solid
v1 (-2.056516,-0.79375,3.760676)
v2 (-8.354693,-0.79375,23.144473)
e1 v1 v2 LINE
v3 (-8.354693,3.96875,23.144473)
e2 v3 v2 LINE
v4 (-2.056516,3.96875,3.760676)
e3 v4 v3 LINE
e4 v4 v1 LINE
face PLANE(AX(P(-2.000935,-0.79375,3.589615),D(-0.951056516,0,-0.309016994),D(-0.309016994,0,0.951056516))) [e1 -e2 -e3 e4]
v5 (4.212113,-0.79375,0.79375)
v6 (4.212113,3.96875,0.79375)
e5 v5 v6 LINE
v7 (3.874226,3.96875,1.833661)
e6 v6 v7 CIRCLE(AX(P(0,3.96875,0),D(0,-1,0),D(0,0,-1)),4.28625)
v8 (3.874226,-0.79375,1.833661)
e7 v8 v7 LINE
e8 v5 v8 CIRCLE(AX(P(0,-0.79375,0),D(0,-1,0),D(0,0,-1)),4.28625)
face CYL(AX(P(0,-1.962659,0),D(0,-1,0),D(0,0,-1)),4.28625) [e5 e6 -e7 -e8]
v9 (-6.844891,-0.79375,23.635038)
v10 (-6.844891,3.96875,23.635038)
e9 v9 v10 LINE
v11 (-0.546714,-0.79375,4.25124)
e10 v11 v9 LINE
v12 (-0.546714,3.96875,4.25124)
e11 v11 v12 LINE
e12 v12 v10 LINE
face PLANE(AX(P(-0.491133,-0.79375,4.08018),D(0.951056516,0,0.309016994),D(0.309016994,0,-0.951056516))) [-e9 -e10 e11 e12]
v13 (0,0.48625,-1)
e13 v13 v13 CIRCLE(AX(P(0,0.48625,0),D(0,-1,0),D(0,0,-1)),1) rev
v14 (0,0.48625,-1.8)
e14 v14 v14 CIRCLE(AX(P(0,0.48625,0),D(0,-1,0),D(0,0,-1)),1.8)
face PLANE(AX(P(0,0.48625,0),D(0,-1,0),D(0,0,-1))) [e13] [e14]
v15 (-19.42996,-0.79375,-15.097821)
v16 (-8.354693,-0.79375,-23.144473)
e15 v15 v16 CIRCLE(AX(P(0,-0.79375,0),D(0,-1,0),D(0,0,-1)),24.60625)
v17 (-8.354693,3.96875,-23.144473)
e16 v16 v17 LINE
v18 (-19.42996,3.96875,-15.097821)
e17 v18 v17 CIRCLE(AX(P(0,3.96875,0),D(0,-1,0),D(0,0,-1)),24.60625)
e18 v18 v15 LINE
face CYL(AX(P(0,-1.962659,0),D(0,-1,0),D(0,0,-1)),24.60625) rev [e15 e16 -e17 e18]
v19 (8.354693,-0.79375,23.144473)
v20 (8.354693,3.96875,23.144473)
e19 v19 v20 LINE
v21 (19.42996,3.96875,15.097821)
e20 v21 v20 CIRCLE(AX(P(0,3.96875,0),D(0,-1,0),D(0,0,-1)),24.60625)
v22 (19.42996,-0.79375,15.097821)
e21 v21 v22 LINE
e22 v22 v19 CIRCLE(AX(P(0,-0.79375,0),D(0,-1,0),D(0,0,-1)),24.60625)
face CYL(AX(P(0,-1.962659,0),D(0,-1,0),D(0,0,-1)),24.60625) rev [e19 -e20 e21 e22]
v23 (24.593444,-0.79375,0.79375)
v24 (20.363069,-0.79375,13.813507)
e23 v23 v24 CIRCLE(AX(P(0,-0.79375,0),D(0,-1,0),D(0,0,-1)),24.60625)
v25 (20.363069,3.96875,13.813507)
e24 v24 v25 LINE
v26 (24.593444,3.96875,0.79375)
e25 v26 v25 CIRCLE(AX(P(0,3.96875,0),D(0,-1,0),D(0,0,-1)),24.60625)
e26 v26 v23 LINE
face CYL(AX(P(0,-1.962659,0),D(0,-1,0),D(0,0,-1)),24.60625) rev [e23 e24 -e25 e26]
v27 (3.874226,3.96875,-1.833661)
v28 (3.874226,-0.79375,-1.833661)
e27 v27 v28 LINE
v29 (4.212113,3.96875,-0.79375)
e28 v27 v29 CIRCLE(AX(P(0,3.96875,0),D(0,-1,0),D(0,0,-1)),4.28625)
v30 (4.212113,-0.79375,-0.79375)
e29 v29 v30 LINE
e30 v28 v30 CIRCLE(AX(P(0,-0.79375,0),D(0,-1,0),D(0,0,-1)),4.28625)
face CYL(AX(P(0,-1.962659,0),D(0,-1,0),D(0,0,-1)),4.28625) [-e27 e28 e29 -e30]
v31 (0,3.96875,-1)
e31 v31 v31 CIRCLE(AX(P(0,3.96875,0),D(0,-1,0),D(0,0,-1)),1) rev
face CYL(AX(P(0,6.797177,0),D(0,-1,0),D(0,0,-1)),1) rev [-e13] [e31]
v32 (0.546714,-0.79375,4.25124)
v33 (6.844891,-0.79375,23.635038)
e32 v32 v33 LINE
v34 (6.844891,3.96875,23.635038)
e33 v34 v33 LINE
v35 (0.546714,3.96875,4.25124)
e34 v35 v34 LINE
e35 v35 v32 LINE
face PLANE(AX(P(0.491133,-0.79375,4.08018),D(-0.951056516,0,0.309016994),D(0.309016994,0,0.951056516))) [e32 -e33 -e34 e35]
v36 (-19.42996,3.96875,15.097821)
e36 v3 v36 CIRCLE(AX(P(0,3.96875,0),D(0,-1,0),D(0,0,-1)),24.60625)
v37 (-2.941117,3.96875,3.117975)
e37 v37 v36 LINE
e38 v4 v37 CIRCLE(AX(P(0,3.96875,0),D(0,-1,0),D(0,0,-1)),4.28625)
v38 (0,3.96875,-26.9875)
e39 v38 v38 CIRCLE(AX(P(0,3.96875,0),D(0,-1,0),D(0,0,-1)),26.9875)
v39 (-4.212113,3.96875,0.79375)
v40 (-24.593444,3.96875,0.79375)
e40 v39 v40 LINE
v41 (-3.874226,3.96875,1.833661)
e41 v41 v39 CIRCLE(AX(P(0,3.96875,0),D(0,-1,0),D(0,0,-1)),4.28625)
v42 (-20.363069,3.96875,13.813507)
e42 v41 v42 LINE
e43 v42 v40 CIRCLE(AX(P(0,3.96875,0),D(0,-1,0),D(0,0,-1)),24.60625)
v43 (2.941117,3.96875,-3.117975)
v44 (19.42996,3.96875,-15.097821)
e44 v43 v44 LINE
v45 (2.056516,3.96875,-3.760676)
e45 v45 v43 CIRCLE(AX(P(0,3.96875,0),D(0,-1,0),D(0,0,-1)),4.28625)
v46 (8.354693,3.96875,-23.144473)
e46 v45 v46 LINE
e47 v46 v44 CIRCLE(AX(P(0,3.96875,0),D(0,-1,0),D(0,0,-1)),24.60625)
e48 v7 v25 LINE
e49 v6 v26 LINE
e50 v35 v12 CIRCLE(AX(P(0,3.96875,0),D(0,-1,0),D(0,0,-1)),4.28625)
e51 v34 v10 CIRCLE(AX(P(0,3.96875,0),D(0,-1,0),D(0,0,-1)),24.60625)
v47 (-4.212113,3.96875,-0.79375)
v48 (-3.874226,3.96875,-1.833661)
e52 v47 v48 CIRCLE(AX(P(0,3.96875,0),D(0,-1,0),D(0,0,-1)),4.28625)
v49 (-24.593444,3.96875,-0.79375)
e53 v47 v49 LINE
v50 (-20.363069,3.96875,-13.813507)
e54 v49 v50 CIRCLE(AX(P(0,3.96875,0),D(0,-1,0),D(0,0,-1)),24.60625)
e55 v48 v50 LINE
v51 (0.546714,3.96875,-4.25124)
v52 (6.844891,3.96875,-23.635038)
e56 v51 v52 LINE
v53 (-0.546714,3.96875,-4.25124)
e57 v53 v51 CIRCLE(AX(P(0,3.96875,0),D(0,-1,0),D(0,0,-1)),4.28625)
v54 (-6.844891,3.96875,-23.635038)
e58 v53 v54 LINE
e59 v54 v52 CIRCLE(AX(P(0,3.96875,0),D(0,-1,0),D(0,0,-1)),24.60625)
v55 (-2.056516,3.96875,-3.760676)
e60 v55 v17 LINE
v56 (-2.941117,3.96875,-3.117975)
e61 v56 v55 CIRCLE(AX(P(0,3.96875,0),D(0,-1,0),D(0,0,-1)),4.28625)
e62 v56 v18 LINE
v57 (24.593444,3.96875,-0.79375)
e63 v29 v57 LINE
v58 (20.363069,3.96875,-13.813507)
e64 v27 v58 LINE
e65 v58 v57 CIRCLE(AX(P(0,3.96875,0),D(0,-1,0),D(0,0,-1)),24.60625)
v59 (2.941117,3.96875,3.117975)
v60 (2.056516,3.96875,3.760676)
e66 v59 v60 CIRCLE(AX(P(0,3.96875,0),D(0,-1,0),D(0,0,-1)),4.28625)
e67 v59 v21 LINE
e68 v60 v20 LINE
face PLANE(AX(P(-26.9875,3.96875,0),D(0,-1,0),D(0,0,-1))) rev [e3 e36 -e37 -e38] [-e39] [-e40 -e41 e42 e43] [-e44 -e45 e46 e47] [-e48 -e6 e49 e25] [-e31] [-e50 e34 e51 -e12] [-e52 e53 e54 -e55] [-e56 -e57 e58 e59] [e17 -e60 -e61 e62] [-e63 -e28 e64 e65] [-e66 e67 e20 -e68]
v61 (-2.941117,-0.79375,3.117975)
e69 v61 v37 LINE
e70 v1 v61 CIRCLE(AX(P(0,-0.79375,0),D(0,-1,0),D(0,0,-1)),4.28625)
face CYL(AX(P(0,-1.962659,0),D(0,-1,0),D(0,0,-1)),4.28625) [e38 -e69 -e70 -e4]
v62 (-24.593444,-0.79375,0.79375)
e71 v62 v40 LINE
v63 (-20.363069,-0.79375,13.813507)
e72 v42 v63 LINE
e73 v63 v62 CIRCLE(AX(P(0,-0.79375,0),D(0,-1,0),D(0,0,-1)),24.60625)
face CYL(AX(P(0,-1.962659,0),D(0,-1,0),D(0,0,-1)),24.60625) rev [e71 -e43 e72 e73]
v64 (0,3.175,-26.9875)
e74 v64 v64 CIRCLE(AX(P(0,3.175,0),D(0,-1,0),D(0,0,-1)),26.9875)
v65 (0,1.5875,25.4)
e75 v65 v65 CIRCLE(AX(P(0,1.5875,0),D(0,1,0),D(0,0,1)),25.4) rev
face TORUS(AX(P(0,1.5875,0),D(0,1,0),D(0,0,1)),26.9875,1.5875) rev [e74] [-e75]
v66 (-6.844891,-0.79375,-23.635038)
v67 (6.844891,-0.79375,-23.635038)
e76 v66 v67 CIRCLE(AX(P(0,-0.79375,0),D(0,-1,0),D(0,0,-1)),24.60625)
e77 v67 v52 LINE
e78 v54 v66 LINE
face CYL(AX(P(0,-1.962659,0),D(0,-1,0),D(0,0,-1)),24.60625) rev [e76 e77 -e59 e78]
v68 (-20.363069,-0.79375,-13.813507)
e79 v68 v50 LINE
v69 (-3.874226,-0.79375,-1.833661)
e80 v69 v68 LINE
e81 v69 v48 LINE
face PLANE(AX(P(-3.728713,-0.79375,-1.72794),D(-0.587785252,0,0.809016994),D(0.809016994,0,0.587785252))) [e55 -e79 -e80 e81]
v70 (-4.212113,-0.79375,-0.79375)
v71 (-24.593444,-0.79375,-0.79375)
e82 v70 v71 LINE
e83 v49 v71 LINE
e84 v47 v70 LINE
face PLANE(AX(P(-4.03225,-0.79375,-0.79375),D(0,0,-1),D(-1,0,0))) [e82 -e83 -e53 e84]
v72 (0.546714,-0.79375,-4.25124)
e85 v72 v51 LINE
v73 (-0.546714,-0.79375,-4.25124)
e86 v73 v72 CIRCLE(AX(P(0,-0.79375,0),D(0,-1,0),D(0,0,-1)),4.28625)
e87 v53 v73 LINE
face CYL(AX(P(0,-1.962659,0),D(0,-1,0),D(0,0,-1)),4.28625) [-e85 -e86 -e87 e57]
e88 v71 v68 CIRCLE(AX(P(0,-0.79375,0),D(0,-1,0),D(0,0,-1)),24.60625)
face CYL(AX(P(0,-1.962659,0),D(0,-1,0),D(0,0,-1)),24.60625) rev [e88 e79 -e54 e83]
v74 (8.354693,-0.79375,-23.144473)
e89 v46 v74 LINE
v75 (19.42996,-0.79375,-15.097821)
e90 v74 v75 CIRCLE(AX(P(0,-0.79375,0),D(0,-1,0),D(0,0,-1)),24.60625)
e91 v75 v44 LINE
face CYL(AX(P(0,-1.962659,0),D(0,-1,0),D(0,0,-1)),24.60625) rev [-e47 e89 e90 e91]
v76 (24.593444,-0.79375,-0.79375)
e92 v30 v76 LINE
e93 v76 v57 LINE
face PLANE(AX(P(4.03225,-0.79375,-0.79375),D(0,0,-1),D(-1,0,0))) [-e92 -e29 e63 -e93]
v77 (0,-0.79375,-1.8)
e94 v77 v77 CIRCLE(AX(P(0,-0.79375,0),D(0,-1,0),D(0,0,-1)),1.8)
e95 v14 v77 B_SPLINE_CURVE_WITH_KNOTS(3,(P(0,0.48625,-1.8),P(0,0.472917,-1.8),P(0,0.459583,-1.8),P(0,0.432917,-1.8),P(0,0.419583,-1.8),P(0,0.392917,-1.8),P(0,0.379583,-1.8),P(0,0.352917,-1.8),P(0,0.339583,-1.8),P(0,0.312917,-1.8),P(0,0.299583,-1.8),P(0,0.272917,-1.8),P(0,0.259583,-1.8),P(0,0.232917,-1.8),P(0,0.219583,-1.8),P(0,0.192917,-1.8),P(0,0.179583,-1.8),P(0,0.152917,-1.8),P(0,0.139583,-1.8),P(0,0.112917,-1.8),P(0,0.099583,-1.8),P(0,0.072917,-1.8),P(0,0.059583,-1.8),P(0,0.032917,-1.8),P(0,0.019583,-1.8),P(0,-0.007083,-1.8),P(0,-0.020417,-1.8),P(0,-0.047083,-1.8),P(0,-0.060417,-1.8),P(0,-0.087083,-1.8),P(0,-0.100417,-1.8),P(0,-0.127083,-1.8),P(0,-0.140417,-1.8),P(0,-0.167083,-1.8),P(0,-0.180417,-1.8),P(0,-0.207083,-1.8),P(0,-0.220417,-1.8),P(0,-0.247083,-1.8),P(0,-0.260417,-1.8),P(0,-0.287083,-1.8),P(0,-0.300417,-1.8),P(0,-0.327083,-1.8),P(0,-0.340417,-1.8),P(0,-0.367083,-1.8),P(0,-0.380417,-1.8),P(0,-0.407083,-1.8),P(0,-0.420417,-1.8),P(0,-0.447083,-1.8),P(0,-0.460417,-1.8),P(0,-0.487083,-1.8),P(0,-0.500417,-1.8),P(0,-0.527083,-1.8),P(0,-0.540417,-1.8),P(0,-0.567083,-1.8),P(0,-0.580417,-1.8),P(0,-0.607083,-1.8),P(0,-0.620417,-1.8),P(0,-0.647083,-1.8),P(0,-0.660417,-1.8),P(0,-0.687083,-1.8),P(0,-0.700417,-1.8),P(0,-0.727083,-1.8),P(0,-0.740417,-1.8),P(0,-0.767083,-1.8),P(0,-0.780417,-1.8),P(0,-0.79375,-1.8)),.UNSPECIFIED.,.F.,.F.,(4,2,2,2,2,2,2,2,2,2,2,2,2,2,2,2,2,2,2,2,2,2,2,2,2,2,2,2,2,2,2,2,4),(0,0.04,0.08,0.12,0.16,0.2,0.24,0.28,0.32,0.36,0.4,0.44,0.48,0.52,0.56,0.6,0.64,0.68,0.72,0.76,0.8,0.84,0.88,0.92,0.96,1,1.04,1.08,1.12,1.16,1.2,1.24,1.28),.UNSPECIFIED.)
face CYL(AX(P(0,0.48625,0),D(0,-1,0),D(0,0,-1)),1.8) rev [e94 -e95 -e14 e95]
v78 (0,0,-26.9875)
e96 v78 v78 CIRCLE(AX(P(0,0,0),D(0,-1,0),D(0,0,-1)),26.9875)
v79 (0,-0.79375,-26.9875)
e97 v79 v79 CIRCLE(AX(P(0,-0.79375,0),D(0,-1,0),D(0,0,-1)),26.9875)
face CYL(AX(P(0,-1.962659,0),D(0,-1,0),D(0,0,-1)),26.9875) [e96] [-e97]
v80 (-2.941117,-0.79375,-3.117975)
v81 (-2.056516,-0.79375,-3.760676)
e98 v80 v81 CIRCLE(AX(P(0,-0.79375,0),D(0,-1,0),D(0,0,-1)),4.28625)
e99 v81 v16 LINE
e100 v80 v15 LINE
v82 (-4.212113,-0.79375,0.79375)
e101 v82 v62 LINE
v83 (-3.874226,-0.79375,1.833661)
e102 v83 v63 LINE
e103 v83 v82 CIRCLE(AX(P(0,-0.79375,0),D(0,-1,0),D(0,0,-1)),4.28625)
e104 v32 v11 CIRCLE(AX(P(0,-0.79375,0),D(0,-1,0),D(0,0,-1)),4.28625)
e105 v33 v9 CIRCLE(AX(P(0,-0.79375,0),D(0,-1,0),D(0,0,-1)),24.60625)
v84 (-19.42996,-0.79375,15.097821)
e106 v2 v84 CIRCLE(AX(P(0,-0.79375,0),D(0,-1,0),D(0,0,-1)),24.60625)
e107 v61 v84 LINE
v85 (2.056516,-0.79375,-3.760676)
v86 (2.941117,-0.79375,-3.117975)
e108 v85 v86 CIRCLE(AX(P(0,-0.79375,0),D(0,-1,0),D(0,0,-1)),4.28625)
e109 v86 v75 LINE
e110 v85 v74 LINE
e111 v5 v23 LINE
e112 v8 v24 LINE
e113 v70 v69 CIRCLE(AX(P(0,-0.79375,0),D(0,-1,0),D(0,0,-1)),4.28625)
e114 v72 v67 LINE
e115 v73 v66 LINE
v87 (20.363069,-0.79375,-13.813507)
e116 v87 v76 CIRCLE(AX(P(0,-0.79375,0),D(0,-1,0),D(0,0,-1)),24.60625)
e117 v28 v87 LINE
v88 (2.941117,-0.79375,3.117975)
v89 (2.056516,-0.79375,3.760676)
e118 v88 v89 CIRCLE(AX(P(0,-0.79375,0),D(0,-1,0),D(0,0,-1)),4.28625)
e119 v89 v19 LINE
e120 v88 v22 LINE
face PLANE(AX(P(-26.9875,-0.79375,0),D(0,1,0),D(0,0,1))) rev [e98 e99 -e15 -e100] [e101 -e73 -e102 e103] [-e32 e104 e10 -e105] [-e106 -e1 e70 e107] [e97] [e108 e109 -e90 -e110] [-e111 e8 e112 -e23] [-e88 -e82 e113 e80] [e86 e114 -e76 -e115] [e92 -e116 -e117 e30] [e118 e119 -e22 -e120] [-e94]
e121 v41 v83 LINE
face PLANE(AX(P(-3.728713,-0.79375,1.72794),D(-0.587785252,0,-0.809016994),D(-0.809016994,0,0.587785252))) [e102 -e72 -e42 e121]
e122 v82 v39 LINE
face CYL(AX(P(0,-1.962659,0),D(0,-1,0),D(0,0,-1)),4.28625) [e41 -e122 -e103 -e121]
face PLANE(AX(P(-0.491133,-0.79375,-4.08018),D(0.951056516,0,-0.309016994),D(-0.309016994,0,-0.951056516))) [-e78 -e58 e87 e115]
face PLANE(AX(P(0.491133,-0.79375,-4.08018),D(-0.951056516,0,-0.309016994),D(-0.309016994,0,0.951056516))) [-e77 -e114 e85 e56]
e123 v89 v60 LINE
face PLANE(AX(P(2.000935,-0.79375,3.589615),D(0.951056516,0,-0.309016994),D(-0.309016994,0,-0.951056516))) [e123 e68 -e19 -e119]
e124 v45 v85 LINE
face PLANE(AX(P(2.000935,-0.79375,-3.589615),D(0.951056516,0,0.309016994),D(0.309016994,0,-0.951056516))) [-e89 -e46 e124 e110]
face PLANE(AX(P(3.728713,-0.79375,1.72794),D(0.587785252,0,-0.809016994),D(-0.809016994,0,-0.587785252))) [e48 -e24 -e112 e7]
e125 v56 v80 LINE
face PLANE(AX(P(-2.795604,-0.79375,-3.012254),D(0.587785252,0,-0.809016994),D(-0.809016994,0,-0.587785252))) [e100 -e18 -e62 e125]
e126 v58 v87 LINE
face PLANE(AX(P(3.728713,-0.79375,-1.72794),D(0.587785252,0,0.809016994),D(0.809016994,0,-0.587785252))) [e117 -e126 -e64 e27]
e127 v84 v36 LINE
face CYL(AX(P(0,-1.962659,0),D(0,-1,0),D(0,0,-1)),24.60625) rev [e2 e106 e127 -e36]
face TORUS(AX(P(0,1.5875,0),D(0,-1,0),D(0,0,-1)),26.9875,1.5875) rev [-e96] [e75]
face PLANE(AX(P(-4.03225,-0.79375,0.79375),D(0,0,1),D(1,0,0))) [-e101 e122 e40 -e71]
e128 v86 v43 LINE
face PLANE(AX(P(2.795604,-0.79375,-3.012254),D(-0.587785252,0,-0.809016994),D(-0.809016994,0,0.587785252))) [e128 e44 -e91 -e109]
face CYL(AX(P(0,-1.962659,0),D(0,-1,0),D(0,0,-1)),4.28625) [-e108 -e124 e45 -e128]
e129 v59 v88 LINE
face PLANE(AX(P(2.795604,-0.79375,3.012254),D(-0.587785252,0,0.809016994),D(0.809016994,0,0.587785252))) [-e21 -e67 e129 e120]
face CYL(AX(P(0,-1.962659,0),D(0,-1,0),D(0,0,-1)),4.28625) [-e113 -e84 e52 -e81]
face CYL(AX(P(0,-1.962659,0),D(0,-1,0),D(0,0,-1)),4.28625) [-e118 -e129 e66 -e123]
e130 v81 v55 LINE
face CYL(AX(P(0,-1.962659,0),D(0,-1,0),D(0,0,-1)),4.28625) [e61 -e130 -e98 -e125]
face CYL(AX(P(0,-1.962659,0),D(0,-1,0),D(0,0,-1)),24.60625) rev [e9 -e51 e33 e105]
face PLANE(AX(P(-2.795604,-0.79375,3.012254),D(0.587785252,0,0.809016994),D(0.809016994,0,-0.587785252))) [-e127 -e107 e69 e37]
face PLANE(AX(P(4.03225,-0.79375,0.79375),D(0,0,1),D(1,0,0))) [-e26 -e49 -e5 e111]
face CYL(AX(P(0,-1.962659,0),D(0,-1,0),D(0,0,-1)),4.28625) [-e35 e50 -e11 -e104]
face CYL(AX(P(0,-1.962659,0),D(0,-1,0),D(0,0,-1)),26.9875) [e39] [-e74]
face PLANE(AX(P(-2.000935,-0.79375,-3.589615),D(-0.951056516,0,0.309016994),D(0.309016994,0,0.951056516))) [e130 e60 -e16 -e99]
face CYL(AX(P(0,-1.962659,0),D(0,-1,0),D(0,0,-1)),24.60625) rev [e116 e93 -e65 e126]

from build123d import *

# Parameters (mm, degrees)
INNERWHEEL_START                            = -0.79375
INNERWHEEL_OUTLINE_R                        = 4.28625
INNERWHEEL_OUTLINE_R_2                      = 3.01625
INNERWHEEL_DEPTH                            = 4.7625
CONNECTIONINNEROUTER_REACH                  = 43.498
CONNECTIONINNEROUTER_END_RADIUS             = 24.60625
SKETCH3_W                                   = 1.5875
SKETCH3_H                                   = 4.7625
CONNECTIONINNEROUTER_DIRECTION_2_REACH      = 43.498
CONNECTIONINNEROUTER_DIRECTION_2_END_RADIUS = 4.28625
CIRCULARPATTERN_COUNT                       = 10
SKETCH4_R                                   = 3.01625
FILLHOLE_DEPTH                              = 4.7625
M2SCREWHOLE_REACH                           = 40.462
M2SCREWDHOLE_R                              = 1
M2SCREWDKHEAD_R                             = 1.8
M2SCREWHEAD_DEPTH                           = 1.28
FILLET_2_R                                  = 1.5875


# Read off the part's stored shape, not the designer's step: InnerWheel
with BuildPart() as part:
    # OuterWheelSketch → OuterWheel (revolve)
    with BuildSketch(Plane.XY, mode=Mode.PRIVATE) as outerwheel_sk:
        Polygon((-25.4, 0), (-26.9875, 0), (-26.9875, -0.79375), (-24.60625, -0.79375), (-24.60625, 3.96875), (-26.9875, 3.96875), (-26.9875, 3.175), (-25.4, 3.175), align=None)
    revolve(outerwheel_sk.sketch.rotate(Axis((0, -1.962659061, 0), (0, 1, 0)), 270), axis=Axis((0, -1.962659061, 0), (0, 1, 0)))



with BuildPart() as body_2:
    # InnerWheel outline → InnerWheel (new body)
    with BuildSketch(Plane(origin=(0, 0, 0), x_dir=(1, 0, 0), z_dir=(0, 1, 0)).offset(INNERWHEEL_START)):
        Circle(INNERWHEEL_OUTLINE_R)
        Circle(INNERWHEEL_OUTLINE_R_2, mode=Mode.SUBTRACT)
    extrude(amount=INNERWHEEL_DEPTH)


with BuildPart() as part_1:
    add(part.part)

    add(body_2.part)  # ConnectionInnerOuter merges body 2
    # ConnectionInnerOuter: up to this cylinder (the profile starts inside it)
    connectioninnerouter_end = Plane(origin=(0, 1.5875, 0), z_dir=(0, -1, 0)) * Cylinder(CONNECTIONINNEROUTER_END_RADIUS, 137.2085, mode=Mode.PRIVATE)
    # Sketch3 → ConnectionInnerOuter (add, up to the surface)
    with BuildSketch(Plane(origin=(4.28625, 0, 0), x_dir=(0, 0, -1), z_dir=(1, 0, 0)), mode=Mode.PRIVATE) as connectioninnerouter_sk1:
        with Locations((0, 1.5875)):
            Rectangle(SKETCH3_W, SKETCH3_H)
    connectioninnerouter_tool1 = extrude(connectioninnerouter_sk1.sketch, amount=CONNECTIONINNEROUTER_REACH, mode=Mode.PRIVATE) & connectioninnerouter_end
    connectioninnerouter = connectioninnerouter_tool1.solids().sort_by_distance((4.28625, 1.5875, 0))[0]
    add(connectioninnerouter)

    # ConnectionInnerOuter direction 2: up to this cylinder (the profile starts outside it)
    connectioninnerouter_direction_2_end = Plane(origin=(0, 1.5875, 0), z_dir=(0, -1, 0)) * Cylinder(CONNECTIONINNEROUTER_DIRECTION_2_END_RADIUS, 96.5685, mode=Mode.PRIVATE)
    # Sketch3 → ConnectionInnerOuter direction 2 (add, up to the surface)
    with BuildSketch(Plane(origin=(4.28625, 0, 0), x_dir=(0, 0, -1), z_dir=(1, 0, 0)), mode=Mode.PRIVATE) as connectioninnerouter_direction_2_sk1:
        with Locations((0, 1.5875)):
            Rectangle(SKETCH3_W, SKETCH3_H)
    connectioninnerouter_direction_2_tool1 = extrude(connectioninnerouter_direction_2_sk1.sketch, amount=-CONNECTIONINNEROUTER_DIRECTION_2_REACH, mode=Mode.PRIVATE) - connectioninnerouter_direction_2_end
    connectioninnerouter_direction_2 = connectioninnerouter_direction_2_tool1.solids().sort_by_distance((4.28625, 1.5875, 0))[0] + connectioninnerouter_direction_2_tool1.solids().sort_by_distance((4.28625, 1.5875, 0))[1]
    add(connectioninnerouter_direction_2)
    connectioninnerouter = connectioninnerouter + connectioninnerouter_direction_2  # both directions under the feature's name, for the pattern or mirror that repeats it

    # CircularPattern: ConnectionInnerOuter ×10 about axis
    circularpattern_axis = Axis((0, 0, 0), (0, 1, 0))
    for i in range(1, CIRCULARPATTERN_COUNT):
        add(connectioninnerouter.rotate(circularpattern_axis, i * 360 / CIRCULARPATTERN_COUNT))

    # Sketch4 → FillHole (add)
    with BuildSketch(Plane(origin=(0, -0.79375, 0), x_dir=(-1, 0, 0), z_dir=(0, -1, 0))):
        Circle(SKETCH4_R)
    extrude(amount=-FILLHOLE_DEPTH)

    # M2ScrewDHole → M2ScrewHole (cut, up to next)
    with BuildSketch(Plane(origin=(0, -0.79375, 0), x_dir=(-1, 0, 0), z_dir=(0, -1, 0)), mode=Mode.PRIVATE) as m2screwhole_sk1:
        with Locations(Location((0, 0, 0), (0, 0, 90))):
            Circle(M2SCREWDHOLE_R)
    m2screwhole_tool1 = extrude(m2screwhole_sk1.sketch, amount=-M2SCREWHOLE_REACH, mode=Mode.PRIVATE) & part_1.part
    add(m2screwhole_tool1.solids().sort_by_distance((0, -0.79375, 0))[0], mode=Mode.SUBTRACT)

    # M2ScrewDKHead → M2ScrewHead (cut)
    with BuildSketch(Plane(origin=(0, -0.79375, 0), x_dir=(-1, 0, 0), z_dir=(0, -1, 0))):
        with Locations(Location((0, 0, 0), (0, 0, 90))):
            Circle(M2SCREWDKHEAD_R)
    extrude(amount=-M2SCREWHEAD_DEPTH, mode=Mode.SUBTRACT)

    # Fillet 2
    fillet_2_edges = [part_1.edges().sort_by_distance(p)[0] for p in [
        (0, 0, 25.4),
        (0, 3.175, 25.4),
    ]]
    fillet(fillet_2_edges, radius=FILLET_2_R - 0.0001)  # a hair under: the kernel refuses the full size


solid = part_1.part
